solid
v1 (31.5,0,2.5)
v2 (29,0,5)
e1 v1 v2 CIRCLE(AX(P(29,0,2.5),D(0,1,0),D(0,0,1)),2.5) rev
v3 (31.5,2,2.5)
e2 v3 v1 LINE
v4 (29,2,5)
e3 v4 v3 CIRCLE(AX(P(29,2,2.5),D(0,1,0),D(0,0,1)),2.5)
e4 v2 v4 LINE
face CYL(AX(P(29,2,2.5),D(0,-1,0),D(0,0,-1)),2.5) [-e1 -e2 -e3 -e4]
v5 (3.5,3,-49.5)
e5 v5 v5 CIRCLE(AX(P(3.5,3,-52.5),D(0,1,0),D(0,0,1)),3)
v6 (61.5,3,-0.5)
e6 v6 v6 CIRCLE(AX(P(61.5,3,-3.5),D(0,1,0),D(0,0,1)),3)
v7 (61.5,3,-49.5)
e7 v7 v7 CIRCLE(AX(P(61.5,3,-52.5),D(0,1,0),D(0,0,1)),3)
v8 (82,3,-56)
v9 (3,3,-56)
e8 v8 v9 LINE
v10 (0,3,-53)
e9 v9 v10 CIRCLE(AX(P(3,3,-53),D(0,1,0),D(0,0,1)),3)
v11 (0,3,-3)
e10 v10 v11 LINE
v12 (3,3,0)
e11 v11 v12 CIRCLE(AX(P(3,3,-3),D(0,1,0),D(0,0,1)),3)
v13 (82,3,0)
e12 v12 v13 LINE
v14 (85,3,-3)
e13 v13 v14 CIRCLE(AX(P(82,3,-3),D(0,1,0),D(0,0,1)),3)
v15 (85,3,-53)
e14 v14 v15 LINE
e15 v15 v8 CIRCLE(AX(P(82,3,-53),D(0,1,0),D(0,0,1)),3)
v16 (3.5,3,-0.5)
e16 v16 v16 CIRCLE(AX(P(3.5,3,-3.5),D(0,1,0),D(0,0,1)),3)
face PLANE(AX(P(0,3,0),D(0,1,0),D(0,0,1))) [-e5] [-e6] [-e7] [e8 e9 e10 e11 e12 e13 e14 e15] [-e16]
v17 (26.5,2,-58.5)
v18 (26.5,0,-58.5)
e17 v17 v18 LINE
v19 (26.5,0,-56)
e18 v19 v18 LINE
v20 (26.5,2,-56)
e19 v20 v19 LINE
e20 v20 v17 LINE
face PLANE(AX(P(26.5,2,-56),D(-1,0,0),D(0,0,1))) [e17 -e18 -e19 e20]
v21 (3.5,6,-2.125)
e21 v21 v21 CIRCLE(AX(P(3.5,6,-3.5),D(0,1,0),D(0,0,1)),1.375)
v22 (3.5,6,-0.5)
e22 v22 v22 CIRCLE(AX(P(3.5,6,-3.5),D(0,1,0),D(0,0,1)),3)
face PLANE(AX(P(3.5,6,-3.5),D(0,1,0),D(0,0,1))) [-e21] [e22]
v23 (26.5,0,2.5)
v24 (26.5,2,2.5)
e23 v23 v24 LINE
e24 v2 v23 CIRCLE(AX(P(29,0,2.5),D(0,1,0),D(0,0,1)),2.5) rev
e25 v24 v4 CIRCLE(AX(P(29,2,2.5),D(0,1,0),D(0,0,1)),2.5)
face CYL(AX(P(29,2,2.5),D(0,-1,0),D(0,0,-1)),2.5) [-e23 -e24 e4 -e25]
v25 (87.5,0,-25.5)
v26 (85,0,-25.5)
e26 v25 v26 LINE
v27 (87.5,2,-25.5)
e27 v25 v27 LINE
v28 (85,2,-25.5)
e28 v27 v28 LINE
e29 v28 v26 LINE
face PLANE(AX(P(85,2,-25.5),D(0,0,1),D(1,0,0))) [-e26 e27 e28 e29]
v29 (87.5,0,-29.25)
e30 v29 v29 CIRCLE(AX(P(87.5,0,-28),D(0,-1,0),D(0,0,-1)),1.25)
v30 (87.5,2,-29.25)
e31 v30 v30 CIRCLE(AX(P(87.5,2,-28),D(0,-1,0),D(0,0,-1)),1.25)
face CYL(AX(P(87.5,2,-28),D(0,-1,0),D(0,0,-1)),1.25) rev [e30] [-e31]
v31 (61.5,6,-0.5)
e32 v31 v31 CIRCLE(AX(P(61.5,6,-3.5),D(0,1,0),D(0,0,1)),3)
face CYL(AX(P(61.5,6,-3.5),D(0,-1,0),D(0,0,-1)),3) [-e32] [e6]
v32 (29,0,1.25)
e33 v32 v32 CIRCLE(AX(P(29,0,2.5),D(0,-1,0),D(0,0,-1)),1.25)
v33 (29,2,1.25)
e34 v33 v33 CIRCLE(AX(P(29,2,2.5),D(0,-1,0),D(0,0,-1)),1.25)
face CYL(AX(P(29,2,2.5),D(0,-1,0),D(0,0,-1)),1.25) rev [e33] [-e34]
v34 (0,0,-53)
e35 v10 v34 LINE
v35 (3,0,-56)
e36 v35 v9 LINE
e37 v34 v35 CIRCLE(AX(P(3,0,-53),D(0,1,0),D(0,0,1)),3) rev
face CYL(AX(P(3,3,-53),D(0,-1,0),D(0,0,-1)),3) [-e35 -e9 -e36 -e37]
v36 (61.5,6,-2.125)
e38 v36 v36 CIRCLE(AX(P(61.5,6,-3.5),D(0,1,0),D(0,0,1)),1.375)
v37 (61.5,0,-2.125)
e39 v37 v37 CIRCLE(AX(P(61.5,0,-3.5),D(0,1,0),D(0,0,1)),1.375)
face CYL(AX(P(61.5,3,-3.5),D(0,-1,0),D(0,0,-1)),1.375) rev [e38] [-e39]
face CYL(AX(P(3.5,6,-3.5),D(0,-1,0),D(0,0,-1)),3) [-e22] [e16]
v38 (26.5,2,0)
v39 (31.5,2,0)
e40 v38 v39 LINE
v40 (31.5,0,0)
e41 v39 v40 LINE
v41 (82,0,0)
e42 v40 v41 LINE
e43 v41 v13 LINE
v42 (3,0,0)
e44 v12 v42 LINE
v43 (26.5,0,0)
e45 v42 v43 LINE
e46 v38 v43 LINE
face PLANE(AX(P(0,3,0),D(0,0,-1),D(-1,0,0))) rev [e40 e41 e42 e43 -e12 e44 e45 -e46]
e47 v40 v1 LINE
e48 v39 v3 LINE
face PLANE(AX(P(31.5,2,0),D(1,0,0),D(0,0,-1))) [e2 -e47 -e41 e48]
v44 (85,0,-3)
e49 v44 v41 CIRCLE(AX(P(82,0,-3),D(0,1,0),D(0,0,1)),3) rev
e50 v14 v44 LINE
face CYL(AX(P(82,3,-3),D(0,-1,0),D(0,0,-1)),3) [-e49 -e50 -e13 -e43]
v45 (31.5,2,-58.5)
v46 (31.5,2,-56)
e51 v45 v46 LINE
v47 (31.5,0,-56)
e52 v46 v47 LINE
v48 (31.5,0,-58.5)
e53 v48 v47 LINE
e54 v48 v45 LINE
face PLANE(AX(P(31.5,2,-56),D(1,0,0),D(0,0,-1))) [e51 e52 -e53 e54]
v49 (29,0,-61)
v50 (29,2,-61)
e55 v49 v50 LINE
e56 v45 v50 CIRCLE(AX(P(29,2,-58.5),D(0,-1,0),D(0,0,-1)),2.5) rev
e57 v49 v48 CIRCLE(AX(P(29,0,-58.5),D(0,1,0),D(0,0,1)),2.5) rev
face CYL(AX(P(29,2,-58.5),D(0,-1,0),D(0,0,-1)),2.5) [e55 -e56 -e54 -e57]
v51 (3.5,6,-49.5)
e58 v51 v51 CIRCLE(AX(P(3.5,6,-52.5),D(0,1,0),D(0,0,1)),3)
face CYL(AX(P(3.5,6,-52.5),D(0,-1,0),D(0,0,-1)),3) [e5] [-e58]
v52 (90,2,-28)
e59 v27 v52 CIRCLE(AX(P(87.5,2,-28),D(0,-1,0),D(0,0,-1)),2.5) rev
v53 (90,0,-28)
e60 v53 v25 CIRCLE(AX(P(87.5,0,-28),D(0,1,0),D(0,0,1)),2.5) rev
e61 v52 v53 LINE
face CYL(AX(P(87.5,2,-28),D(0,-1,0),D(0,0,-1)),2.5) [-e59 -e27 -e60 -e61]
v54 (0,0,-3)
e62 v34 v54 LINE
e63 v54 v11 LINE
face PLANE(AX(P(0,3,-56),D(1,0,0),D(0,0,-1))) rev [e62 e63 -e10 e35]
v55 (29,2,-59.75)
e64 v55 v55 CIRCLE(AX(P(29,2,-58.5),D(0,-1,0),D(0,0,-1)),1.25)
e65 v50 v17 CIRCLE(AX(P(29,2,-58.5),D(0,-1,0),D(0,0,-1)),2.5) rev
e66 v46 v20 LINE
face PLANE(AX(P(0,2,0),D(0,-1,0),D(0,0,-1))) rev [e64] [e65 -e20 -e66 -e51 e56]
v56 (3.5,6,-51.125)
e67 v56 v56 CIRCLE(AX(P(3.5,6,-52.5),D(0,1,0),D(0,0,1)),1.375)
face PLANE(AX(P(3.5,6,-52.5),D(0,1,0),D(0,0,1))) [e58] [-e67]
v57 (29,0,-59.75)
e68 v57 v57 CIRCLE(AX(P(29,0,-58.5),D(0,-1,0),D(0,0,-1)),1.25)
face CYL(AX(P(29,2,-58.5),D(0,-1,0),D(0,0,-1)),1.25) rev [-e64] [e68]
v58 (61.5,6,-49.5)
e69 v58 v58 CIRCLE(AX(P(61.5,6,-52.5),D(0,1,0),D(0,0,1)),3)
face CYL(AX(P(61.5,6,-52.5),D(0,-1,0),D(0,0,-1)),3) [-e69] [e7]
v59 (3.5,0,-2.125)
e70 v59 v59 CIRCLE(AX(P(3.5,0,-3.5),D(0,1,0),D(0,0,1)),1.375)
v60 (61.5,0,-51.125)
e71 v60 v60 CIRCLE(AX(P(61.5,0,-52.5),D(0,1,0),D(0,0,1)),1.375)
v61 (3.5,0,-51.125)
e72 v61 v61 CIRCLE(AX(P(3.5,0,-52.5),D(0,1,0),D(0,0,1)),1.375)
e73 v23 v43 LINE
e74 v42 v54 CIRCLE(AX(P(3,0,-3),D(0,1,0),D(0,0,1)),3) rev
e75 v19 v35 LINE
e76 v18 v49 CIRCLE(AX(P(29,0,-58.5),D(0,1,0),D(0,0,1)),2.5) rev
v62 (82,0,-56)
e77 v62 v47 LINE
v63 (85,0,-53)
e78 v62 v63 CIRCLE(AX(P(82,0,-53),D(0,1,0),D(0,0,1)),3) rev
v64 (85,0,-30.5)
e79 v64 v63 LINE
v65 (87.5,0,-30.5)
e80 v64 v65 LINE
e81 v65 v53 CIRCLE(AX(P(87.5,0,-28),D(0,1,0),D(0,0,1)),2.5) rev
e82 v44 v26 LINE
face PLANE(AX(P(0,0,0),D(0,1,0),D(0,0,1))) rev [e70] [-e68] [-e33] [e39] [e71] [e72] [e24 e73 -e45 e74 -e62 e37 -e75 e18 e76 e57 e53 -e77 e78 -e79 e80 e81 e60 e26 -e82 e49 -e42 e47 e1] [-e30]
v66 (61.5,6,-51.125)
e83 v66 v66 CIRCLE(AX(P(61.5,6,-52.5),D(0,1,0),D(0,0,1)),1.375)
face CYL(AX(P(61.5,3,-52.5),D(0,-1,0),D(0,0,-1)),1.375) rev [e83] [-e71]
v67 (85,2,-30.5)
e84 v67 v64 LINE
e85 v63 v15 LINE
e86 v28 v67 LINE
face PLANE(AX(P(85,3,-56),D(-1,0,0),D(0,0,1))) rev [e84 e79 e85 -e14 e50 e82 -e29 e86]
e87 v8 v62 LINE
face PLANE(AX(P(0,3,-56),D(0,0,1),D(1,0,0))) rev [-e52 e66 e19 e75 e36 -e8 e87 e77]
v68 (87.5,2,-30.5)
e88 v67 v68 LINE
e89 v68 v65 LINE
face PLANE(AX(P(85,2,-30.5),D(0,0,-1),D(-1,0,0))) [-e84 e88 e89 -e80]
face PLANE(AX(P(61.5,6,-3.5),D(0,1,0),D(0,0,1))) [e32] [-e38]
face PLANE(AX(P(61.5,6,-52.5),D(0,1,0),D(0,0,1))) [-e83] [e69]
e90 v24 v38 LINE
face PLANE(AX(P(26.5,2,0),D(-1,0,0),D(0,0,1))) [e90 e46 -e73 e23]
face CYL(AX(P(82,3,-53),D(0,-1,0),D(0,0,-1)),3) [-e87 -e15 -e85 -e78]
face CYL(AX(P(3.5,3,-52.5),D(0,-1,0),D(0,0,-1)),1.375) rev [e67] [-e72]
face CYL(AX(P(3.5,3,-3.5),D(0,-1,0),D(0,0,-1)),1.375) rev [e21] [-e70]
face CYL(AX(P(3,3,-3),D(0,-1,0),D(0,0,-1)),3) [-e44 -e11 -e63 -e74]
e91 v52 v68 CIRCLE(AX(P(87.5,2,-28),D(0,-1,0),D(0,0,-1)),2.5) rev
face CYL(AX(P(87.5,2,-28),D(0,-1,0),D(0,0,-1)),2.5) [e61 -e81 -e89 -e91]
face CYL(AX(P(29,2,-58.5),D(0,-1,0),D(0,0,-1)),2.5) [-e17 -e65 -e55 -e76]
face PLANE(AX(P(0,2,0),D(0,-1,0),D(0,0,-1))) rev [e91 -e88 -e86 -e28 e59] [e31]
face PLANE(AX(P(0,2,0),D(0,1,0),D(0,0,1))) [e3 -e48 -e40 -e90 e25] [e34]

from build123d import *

# Parameters (mm, degrees)
SKETCH1_W           = 85
SKETCH1_H           = 56
SKETCH1_R           = 1.375
BOSS_EXTRUDE1_DEPTH = 3
FILLET1_R           = 3
SKETCH3_R           = 3
SKETCH3_R_2         = 1.375
BOSS_EXTRUDE3_DEPTH = 3
SKETCH5_W           = 5
SKETCH5_H           = 5
SKETCH5_R           = 1.25
BOSS_EXTRUDE4_DEPTH = 2
FILLET2_R           = 2.5
SKETCH6_W           = 5
SKETCH6_H           = 5
SKETCH6_R           = 1.25
BOSS_EXTRUDE5_DEPTH = 2
FILLET3_R           = 2.5
SKETCH8_W           = 5
SKETCH8_H           = 5
SKETCH8_R           = 1.25
BOSS_EXTRUDE7_DEPTH = 2
FILLET5_R           = 2.5


with BuildPart() as part:
    # Sketch1 → Boss-Extrude1 (new body)
    with BuildSketch(Plane(origin=(0, 0, 0), x_dir=(1, 0, 0), z_dir=(0, 1, 0))):
        with Locations((42.5, 28)):
            Rectangle(SKETCH1_W, SKETCH1_H)
        with Locations(Location((3.5, 52.5, 0), (0, 0, 270))):
            Circle(SKETCH1_R, mode=Mode.SUBTRACT)
        with Locations(Location((61.5, 52.5, 0), (0, 0, 270))):
            Circle(SKETCH1_R, mode=Mode.SUBTRACT)
        with Locations(Location((3.5, 3.5, 0), (0, 0, 270))):
            Circle(SKETCH1_R, mode=Mode.SUBTRACT)
        with Locations(Location((61.5, 3.5, 0), (0, 0, 270))):
            Circle(SKETCH1_R, mode=Mode.SUBTRACT)
    extrude(amount=BOSS_EXTRUDE1_DEPTH)

    # Fillet1
    fillet1_edges = [part.edges().sort_by_distance(p)[0] for p in [
        (0, 1.5, -56),
        (85, 1.5, -56),
        (85, 1.5, 0),
        (0, 1.5, 0),
    ]]
    fillet(fillet1_edges, radius=FILLET1_R)

    # Sketch3 → Boss-Extrude3 (add)
    # profile 1 of 4: a face of its own
    with BuildSketch(Plane(origin=(0, 3, 0), x_dir=(1, 0, 0), z_dir=(0, 1, 0))):
        with Locations(Location((3.5, 52.5, 0), (0, 0, 270))):
            Circle(SKETCH3_R)
        with Locations(Location((3.5, 52.5, 0), (0, 0, 270))):
            Circle(SKETCH3_R_2, mode=Mode.SUBTRACT)
    # profile 2 of 4: a face of its own
    with BuildSketch(Plane(origin=(0, 3, 0), x_dir=(1, 0, 0), z_dir=(0, 1, 0))):
        with Locations(Location((61.5, 52.5, 0), (0, 0, 270))):
            Circle(SKETCH3_R)
        with Locations(Location((61.5, 52.5, 0), (0, 0, 270))):
            Circle(SKETCH3_R_2, mode=Mode.SUBTRACT)
    # profile 3 of 4: a face of its own
    with BuildSketch(Plane(origin=(0, 3, 0), x_dir=(1, 0, 0), z_dir=(0, 1, 0))):
        with Locations(Location((3.5, 3.5, 0), (0, 0, 270))):
            Circle(SKETCH3_R)
        with Locations(Location((3.5, 3.5, 0), (0, 0, 270))):
            Circle(SKETCH3_R_2, mode=Mode.SUBTRACT)
    # profile 4 of 4: a face of its own
    with BuildSketch(Plane(origin=(0, 3, 0), x_dir=(1, 0, 0), z_dir=(0, 1, 0))):
        with Locations(Location((61.5, 3.5, 0), (0, 0, 270))):
            Circle(SKETCH3_R)
        with Locations(Location((61.5, 3.5, 0), (0, 0, 270))):
            Circle(SKETCH3_R_2, mode=Mode.SUBTRACT)
    extrude(amount=BOSS_EXTRUDE3_DEPTH)

    # Sketch5 → Boss-Extrude4 (add)
    with BuildSketch(Plane.XZ):
        with Locations((29, 2.5)):
            Rectangle(SKETCH5_W, SKETCH5_H)
        with Locations(Location((29, 2.5, 0), (0, 0, 270))):
            Circle(SKETCH5_R, mode=Mode.SUBTRACT)
    extrude(amount=-BOSS_EXTRUDE4_DEPTH)

    # Fillet2
    fillet2_edges = [part.edges().sort_by_distance(p)[0] for p in [
        (26.5, 1, 5),
        (31.5, 1, 5),
    ]]
    fillet(fillet2_edges, radius=FILLET2_R - 0.0001)  # a hair under: the kernel refuses the full size

    # Sketch6 → Boss-Extrude5 (add)
    with BuildSketch(Plane.XZ):
        with Locations((29, -58.5)):
            Rectangle(SKETCH6_W, SKETCH6_H)
        with Locations(Location((29, -58.5, 0), (0, 0, 270))):
            Circle(SKETCH6_R, mode=Mode.SUBTRACT)
    extrude(amount=-BOSS_EXTRUDE5_DEPTH)

    # Fillet3
    fillet3_edges = [part.edges().sort_by_distance(p)[0] for p in [
        (31.5, 1, -61),
        (26.5, 1, -61),
    ]]
    fillet(fillet3_edges, radius=FILLET3_R - 0.0001)  # a hair under: the kernel refuses the full size

    # Sketch8 → Boss-Extrude7 (add)
    with BuildSketch(Plane.XZ):
        with Locations((87.5, -28)):
            Rectangle(SKETCH8_W, SKETCH8_H)
        with Locations(Location((87.5, -28, 0), (0, 0, 270))):
            Circle(SKETCH8_R, mode=Mode.SUBTRACT)
    extrude(amount=-BOSS_EXTRUDE7_DEPTH)

    # Fillet5
    fillet5_edges = [part.edges().sort_by_distance(p)[0] for p in [
        (90, 1, -30.5),
        (90, 1, -25.5),
    ]]
    fillet(fillet5_edges, radius=FILLET5_R - 0.0001)  # a hair under: the kernel refuses the full size


solid = part.part
